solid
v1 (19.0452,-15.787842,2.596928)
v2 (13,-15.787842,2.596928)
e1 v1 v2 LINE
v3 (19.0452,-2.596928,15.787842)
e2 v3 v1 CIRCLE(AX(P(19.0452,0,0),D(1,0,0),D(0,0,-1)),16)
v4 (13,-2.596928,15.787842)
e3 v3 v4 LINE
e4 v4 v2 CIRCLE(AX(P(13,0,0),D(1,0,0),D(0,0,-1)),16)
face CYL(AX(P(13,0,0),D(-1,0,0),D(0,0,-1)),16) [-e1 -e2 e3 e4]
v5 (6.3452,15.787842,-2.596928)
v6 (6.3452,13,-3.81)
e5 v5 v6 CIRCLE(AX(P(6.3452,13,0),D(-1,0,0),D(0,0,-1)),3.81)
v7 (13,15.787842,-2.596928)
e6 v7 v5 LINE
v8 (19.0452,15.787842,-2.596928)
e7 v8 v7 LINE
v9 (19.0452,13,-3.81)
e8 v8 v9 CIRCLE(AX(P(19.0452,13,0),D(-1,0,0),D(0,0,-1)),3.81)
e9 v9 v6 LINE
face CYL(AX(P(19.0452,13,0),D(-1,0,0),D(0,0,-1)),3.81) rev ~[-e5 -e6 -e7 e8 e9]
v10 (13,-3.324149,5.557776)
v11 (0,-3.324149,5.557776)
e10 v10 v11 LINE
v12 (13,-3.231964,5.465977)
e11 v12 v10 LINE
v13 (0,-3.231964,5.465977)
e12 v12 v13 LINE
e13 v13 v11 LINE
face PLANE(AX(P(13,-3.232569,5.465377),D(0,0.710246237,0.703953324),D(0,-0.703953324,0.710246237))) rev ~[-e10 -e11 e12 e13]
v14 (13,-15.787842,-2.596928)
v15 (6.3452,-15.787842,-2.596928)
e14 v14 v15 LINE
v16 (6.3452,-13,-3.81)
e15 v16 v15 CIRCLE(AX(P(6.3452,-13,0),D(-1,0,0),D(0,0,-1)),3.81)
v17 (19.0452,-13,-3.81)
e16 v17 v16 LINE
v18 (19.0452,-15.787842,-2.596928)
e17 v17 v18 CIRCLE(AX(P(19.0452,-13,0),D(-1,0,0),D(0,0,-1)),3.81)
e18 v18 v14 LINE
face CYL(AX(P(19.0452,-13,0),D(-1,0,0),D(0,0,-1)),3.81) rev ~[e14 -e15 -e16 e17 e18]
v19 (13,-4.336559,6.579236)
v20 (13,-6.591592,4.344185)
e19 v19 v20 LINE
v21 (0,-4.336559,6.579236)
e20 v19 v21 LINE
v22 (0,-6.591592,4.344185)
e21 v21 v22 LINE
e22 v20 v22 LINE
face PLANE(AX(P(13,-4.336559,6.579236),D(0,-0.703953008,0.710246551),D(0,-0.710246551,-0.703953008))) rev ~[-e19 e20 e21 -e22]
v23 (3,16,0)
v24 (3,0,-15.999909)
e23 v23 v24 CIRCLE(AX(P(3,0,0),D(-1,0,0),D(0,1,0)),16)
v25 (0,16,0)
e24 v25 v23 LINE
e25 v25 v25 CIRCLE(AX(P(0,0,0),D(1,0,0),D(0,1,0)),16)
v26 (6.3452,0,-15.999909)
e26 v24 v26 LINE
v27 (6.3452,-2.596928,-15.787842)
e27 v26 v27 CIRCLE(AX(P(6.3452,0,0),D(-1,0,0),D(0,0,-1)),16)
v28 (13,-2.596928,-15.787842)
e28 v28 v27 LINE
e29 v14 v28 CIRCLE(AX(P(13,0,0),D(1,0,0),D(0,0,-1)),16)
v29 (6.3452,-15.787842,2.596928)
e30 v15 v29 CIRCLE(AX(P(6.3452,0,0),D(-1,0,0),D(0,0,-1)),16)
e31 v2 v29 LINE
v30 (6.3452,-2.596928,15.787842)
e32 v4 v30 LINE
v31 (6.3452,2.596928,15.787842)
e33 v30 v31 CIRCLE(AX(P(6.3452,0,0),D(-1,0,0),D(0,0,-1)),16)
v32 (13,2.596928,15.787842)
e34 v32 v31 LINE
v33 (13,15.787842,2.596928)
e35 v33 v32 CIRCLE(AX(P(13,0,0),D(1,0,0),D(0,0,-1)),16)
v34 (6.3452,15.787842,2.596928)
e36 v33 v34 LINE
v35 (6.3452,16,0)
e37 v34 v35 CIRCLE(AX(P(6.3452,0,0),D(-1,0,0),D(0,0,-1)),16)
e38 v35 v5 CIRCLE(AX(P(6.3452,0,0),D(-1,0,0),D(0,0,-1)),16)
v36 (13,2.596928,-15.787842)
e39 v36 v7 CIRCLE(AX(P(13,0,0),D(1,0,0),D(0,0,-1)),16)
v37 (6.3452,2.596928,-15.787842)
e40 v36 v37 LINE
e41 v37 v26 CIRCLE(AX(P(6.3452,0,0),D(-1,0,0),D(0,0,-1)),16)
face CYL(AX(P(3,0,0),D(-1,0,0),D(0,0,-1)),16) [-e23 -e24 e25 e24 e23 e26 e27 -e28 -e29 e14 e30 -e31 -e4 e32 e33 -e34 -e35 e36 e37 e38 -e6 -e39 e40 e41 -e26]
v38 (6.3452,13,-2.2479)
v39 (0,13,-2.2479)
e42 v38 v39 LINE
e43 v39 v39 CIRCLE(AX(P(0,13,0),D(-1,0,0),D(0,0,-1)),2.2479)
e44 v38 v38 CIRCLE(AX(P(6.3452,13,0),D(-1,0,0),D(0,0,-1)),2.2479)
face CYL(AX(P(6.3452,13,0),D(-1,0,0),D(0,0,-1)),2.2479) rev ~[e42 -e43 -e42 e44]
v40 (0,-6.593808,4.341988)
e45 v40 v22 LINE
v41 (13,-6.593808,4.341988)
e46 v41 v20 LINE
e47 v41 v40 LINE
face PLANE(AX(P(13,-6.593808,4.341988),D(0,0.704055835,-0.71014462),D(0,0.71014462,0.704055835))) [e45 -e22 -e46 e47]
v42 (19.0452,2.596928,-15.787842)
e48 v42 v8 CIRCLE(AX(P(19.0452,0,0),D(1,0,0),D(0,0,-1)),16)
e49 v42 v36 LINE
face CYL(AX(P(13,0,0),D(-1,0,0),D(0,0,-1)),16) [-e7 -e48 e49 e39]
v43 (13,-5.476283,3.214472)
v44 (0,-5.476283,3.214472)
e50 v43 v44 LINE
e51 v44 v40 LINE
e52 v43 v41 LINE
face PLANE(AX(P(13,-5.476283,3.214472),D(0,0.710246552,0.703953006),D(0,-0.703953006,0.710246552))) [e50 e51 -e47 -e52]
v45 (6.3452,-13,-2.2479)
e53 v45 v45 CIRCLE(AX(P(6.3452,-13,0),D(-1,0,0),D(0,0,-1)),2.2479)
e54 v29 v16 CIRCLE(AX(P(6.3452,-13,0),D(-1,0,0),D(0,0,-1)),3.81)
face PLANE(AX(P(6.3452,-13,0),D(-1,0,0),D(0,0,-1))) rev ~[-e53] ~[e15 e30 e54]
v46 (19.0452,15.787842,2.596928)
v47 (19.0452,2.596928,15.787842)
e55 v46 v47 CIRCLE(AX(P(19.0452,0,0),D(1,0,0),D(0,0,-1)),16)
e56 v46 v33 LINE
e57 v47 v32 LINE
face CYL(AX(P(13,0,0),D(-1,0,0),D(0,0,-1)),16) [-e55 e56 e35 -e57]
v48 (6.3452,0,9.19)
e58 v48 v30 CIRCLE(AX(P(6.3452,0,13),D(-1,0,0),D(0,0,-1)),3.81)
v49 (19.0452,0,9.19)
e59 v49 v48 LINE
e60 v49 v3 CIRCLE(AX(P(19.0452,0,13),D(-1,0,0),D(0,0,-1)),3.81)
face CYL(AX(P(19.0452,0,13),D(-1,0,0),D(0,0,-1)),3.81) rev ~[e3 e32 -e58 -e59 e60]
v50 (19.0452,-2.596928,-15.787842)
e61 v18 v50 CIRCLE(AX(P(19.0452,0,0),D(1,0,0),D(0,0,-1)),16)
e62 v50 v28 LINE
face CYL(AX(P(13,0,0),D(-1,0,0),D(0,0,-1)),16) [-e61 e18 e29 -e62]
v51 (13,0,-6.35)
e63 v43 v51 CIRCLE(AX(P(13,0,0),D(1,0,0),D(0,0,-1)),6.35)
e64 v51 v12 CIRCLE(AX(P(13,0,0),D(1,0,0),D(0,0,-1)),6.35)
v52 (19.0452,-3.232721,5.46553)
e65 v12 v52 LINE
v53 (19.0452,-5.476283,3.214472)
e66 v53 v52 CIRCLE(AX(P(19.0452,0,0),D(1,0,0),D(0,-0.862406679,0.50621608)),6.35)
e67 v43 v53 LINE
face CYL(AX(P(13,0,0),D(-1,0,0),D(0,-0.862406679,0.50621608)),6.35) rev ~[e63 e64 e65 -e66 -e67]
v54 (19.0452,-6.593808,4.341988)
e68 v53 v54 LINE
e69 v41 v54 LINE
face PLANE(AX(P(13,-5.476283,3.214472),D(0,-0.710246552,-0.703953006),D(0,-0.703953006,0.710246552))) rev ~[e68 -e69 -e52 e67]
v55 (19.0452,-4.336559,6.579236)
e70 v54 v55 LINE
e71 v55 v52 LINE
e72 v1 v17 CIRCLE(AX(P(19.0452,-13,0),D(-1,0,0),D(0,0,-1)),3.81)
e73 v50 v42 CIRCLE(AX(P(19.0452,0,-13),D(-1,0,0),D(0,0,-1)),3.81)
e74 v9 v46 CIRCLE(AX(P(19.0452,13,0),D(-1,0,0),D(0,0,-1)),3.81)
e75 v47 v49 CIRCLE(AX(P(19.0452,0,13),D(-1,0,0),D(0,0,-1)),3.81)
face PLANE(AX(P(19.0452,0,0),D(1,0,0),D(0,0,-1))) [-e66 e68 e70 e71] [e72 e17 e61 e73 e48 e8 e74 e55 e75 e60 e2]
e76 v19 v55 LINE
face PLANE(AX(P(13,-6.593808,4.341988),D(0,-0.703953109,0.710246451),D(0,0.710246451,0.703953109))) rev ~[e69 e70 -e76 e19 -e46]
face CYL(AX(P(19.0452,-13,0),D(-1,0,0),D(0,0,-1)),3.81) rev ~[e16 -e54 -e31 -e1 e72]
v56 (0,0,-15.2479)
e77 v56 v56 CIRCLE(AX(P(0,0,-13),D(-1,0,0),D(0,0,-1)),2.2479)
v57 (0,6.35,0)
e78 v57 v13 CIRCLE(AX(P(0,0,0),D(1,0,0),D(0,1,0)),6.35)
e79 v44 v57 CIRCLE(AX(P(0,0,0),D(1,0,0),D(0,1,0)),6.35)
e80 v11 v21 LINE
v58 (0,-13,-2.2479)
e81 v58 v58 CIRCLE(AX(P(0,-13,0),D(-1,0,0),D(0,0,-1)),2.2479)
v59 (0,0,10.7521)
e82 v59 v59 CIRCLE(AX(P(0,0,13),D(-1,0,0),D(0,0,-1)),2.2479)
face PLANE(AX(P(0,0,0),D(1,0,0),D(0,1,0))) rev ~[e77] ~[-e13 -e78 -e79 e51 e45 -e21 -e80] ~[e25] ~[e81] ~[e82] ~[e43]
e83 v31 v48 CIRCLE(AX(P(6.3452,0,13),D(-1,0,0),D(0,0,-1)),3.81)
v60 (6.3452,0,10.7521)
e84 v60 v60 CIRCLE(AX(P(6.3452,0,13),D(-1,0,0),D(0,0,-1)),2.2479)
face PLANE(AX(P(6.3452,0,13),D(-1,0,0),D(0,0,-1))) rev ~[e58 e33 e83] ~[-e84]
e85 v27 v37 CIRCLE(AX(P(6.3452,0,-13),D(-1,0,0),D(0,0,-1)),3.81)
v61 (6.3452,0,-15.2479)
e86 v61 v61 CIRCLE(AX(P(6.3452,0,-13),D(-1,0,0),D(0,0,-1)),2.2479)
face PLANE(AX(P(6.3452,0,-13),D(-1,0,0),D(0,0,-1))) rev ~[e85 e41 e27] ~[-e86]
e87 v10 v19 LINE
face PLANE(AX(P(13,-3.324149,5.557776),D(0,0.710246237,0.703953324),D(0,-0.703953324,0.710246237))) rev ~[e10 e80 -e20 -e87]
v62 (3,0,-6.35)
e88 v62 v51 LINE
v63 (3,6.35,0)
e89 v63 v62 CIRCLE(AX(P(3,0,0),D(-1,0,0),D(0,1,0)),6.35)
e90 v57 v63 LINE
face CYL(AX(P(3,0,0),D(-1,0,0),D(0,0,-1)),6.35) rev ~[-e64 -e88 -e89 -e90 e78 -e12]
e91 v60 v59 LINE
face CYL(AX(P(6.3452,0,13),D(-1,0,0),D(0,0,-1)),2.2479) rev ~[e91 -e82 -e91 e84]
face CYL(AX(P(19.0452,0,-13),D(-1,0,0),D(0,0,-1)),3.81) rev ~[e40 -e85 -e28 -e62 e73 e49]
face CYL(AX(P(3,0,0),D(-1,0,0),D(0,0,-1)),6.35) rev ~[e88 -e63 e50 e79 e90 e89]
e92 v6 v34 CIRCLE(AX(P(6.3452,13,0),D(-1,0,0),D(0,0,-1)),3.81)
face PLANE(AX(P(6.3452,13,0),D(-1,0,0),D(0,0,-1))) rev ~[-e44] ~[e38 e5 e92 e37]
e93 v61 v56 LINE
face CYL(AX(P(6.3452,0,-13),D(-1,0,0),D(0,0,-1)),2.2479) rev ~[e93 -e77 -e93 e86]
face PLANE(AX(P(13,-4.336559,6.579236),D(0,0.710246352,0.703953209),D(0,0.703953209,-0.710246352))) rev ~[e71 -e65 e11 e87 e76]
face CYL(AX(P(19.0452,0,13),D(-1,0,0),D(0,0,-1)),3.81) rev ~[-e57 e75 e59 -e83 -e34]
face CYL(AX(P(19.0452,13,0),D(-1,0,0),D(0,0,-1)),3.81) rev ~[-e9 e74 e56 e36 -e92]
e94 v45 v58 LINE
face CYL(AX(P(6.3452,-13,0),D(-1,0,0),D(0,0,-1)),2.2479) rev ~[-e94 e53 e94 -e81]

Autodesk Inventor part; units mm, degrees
ref_plane "YZ Plane" through (0, 0, 0) normal (1, 0, 0) x (0, 1, 0)
sketch "Sketch1" plane through (0, 0, 0) normal (1, 0, 0) x (0, 1, 0)
  circle A0 centre (0, 0) radius 16
  circle A1 centre (0, 13) radius 2
  circle A2 centre (0, -13) radius 2
  circle A3 centre (-13, 0) radius 2
  circle A4 centre (13, 0) radius 2
  circle A5 centre (0, -13) radius 2
  circle A6 centre (0, 13) radius 2
  circle A7 centre (13, 0) radius 2
  circle A8 centre (-13, 0) radius 2
  circle A9 centre (0, 0) radius 6.35
  line L0 (0, -22.4) -> (0, 22.4) projected
  dimension "d0" = 32
  dimension "d1" = 4
  dimension "d2" = 26
  dimension "d3" = 13
  dimension "d6" = 360
  dimension "d8" = 12.7
extrude "Extrusion1" add sketch "Sketch1" along normal blind 3 contours A0 L0 A2 A9 A1 | L0 A1 A9 A2 A0
sketch "Sketch2" plane through (3, 0, 0) normal (1, 0, 0) x (0, 0, -1)
  circle A0 centre (0, 0) radius 16 projected
  circle A1 centre (13, 0) radius 2 projected
  circle A2 centre (0, 0) radius 6.35 projected
  circle A3 centre (0, -13) radius 2 projected
  circle A4 centre (-13, 0) radius 2 projected
  circle A5 centre (0, 13) radius 2 projected
  circle A6 centre (0, 0) radius 7.5
  dimension "d11" = 15
extrude "Extrusion2" add sketch "Sketch2" along normal blind 10 contours A6
ref_plane "Work Plane1" through (0, 0, 0) normal (0, 0.7071068, -0.7071068) x (-1, 0, 0)
sketch "Sketch6" plane through (3, 0, 0) normal (1, 0, 0) x (0, 0, -1)
  circle A0 centre (0, 0) radius 7.5565
  circle A1 centre (0, 0) radius 6.35 projected
  circle A2 centre (0, 0) radius 7.5 projected
  circle A3 centre (0, 0) radius 6.35 projected
  dimension "d18" = 15.113
sketch "Sketch6 outline for Extrusion4" plane through (3, 0, 0) normal (1, 0, 0) x (0, 0, -1)
  circle A0 centre (0, 0) radius 7.5565
  circle A1 centre (0, 0) radius 7.5
extrude "Extrusion4" add sketch "Sketch6 outline for Extrusion4" along normal up to surface (10 mm away)
sketch "Sketch7" plane through (3, 0, 0) normal (1, 0, 0) x (0, 0, -1)
  circle A0 centre (-13, 0) radius 2
  circle A1 centre (-13, 0) radius 3
  circle A2 centre (0, 13) radius 2
  circle A3 centre (0, 13) radius 3
  circle A4 centre (13, 0) radius 2
  circle A5 centre (13, 0) radius 2.999819
  circle A6 centre (0, -13) radius 2
  circle A7 centre (0, -13) radius 3
  circle A8 centre (0, 0) radius 7.5565
  circle A9 centre (0, 0) radius 16
  circle A10 centre (0, 13) radius 3.81
  circle A11 centre (-13, 0) radius 3.81
  circle A12 centre (0, -13) radius 3.81
  circle A13 centre (13, 0) radius 3.81
  line L0 (-13, 3.81) -> (-15.539752, 3.81)
  line L1 (-13, -3.81) -> (-15.539752, -3.81)
  line L2 (-3.81, -13) -> (-3.81, -15.539752)
  line L3 (3.81, -13) -> (3.81, -15.539752)
  line L4 (13, -3.81) -> (15.539752, -3.81)
  line L5 (13, 3.81) -> (15.539752, 3.81)
  line L6 (-3.81, 13) -> (-3.81, 15.539752)
  line L7 (3.81, 13) -> (3.81, 15.539752)
  point P0 (15.787842, -2.596928)
  point P1 (15.787842, 2.596928)
  point P2 (2.596928, 15.787842)
  point P3 (-2.596928, 15.787842)
  point P4 (-15.787842, 2.596928)
  point P5 (-15.787842, -2.596928)
  point P6 (-2.596928, -15.787842)
  point P7 (2.596928, -15.787842)
  dimension "d21" = 7.62
  dimension "d22" = 7.62
  dimension "d23" = 7.62
  dimension "d24" = 7.62
extrude "Extrusion5" add sketch "Sketch7" along normal up to surface (10 mm away) contours A1 | A9 A11 | A9 L0 A11 | A11 L1 A9 | A9 L6 A10 L7 L5 A13 L4 L3 A12 L2 L1 A11 L0 | A9 A10 L6 | L2 A12 A9 | A3 | A9 A10 | A7 | A12 A9 | A9 L7 A10 | A12 L3 A9 | A9 A13 L5 | L4 A13 A9 | A5 | A9 A13 picked at (-9.491842, -0.282602) picked at (3.503096, 12.696069) picked at (3.503096, -12.696069) picked at (12.57554, -3.495745)
sketch "Sketch8" plane through (13, 0, 0) normal (1, 0, 0) x (0, 0, -1)
  circle A0 centre (0, -13) radius 2
  circle A1 centre (-13, 0) radius 2
  line L0 (-4.495748, -4.495171) -> (-3.429275, -5.671093)
  line L1 (-4.495748, -4.495171) -> (-5.56222, -3.319249)
  circle A2 centre (0, 0) radius 6.35
  line L2 (-5.56222, -3.319249) -> (-5.465977, -3.231964)
  line L3 (-3.429275, -5.671093) -> (-3.214472, -5.476283)
  line L4 (-3.214472, -5.476283) -> (-5.45172, -3.219033)
  line L5 (-5.45172, -3.219033) -> (-6.579236, -4.336559)
  line L6 (-3.214472, -5.476283) -> (-4.341988, -6.593808)
  line L7 (-6.579236, -4.336559) -> (-4.344185, -6.591592)
  line L8 (-4.341988, -6.593808) -> (-4.344185, -6.591592)
  dimension "d27" = 1.5875
  dimension "d28" = 1.5875
  dimension "d29" = 1.5875
  dimension "d30" = 1.5875
  dimension "d31" = 90
  dimension "d32" = 0
  dimension "d33" = 90
  dimension "d34" = 3.175
  dimension "d35" = 90
extrude "Extrusion6" cut sketch "Sketch8" against normal up to surface (13 mm away) contours L1 A2 L3 L0 | L0 L3 L6 L8 L7 L5 L1 | L1 L5 A2 | A2 L5 L4 picked at (-4.633855, -4.096279)
sketch "Sketch9" plane through (13, 0, 0) normal (1, 0, 0) x (0, 0, -1)
  line L0 (-3.214472, -5.476283) -> (-4.341988, -6.593808)
  line L1 (-4.341988, -6.593808) -> (-6.579236, -4.336559)
  line L2 (-6.579236, -4.336559) -> (-5.46553, -3.232721)
  arc A0 (-3.214472, -5.476283) -> (-5.46553, -3.232721) centre (0, 0) ccw
  circle A1 centre (0, 13) radius 2
  circle A2 centre (-13, 0) radius 2
  circle A3 centre (0, -13) radius 2
  circle A4 centre (13, 0) radius 2
  circle A5 centre (0, 0) radius 16
extrude "Extrusion7" add sketch "Sketch9" along normal blind 6.0452
sketch "Sketch10" plane through (19.0452, 0, 0) normal (1, 0, 0) x (0, 0, -1)
  circle A0 centre (13, 0) radius 2 projected
  point P0 (0, 0)
hole "Hole1" at (19.0452, 0, -13) direction (-1, 0, 0) diameter 4.4958 end through all counterbore diameter 7.62 counterbore depth 12.7 clearance for "Hex Machine Screw" size "#8" standard "Ansi Unified Screw Threads"
sketch "Sketch11" plane through (19.0452, 0, 0) normal (1, 0, 0) x (0, 0, -1)
  circle A0 centre (0, 13) radius 2 projected
  point P0 (0, 0)
  point P1 (0, 13)
hole "Hole2" at (19.0452, 13, 0) direction (-1, 0, 0) diameter 4.4958 end through all counterbore diameter 7.62 counterbore depth 12.7 clearance for "Hex Machine Screw" size "#8" standard "Ansi Unified Screw Threads"
sketch "Sketch12" plane through (19.0452, 0, 0) normal (1, 0, 0) x (0, 0, -1)
  circle A0 centre (-13, 0) radius 2 projected
  point P0 (0, 0)
hole "Hole3" at (19.0452, 0, 13) direction (-1, 0, 0) diameter 4.4958 end through all counterbore diameter 7.62 counterbore depth 12.7 clearance for "Hex Machine Screw" size "#8" standard "Ansi Unified Screw Threads"
sketch "Sketch13" plane through (19.0452, 0, 0) normal (1, 0, 0) x (0, 0, -1)
  circle A0 centre (0, -13) radius 2 projected
  point P0 (0, 0)
  point P1 (0, -13)
hole "Hole4" at (19.0452, -13, 0) direction (-1, 0, 0) diameter 4.4958 end through all counterbore diameter 7.62 counterbore depth 12.7 clearance for "Hex Machine Screw" size "#8" standard "Ansi Unified Screw Threads"
properties part number "HipCoupler V2" material "Steel, Mild"
